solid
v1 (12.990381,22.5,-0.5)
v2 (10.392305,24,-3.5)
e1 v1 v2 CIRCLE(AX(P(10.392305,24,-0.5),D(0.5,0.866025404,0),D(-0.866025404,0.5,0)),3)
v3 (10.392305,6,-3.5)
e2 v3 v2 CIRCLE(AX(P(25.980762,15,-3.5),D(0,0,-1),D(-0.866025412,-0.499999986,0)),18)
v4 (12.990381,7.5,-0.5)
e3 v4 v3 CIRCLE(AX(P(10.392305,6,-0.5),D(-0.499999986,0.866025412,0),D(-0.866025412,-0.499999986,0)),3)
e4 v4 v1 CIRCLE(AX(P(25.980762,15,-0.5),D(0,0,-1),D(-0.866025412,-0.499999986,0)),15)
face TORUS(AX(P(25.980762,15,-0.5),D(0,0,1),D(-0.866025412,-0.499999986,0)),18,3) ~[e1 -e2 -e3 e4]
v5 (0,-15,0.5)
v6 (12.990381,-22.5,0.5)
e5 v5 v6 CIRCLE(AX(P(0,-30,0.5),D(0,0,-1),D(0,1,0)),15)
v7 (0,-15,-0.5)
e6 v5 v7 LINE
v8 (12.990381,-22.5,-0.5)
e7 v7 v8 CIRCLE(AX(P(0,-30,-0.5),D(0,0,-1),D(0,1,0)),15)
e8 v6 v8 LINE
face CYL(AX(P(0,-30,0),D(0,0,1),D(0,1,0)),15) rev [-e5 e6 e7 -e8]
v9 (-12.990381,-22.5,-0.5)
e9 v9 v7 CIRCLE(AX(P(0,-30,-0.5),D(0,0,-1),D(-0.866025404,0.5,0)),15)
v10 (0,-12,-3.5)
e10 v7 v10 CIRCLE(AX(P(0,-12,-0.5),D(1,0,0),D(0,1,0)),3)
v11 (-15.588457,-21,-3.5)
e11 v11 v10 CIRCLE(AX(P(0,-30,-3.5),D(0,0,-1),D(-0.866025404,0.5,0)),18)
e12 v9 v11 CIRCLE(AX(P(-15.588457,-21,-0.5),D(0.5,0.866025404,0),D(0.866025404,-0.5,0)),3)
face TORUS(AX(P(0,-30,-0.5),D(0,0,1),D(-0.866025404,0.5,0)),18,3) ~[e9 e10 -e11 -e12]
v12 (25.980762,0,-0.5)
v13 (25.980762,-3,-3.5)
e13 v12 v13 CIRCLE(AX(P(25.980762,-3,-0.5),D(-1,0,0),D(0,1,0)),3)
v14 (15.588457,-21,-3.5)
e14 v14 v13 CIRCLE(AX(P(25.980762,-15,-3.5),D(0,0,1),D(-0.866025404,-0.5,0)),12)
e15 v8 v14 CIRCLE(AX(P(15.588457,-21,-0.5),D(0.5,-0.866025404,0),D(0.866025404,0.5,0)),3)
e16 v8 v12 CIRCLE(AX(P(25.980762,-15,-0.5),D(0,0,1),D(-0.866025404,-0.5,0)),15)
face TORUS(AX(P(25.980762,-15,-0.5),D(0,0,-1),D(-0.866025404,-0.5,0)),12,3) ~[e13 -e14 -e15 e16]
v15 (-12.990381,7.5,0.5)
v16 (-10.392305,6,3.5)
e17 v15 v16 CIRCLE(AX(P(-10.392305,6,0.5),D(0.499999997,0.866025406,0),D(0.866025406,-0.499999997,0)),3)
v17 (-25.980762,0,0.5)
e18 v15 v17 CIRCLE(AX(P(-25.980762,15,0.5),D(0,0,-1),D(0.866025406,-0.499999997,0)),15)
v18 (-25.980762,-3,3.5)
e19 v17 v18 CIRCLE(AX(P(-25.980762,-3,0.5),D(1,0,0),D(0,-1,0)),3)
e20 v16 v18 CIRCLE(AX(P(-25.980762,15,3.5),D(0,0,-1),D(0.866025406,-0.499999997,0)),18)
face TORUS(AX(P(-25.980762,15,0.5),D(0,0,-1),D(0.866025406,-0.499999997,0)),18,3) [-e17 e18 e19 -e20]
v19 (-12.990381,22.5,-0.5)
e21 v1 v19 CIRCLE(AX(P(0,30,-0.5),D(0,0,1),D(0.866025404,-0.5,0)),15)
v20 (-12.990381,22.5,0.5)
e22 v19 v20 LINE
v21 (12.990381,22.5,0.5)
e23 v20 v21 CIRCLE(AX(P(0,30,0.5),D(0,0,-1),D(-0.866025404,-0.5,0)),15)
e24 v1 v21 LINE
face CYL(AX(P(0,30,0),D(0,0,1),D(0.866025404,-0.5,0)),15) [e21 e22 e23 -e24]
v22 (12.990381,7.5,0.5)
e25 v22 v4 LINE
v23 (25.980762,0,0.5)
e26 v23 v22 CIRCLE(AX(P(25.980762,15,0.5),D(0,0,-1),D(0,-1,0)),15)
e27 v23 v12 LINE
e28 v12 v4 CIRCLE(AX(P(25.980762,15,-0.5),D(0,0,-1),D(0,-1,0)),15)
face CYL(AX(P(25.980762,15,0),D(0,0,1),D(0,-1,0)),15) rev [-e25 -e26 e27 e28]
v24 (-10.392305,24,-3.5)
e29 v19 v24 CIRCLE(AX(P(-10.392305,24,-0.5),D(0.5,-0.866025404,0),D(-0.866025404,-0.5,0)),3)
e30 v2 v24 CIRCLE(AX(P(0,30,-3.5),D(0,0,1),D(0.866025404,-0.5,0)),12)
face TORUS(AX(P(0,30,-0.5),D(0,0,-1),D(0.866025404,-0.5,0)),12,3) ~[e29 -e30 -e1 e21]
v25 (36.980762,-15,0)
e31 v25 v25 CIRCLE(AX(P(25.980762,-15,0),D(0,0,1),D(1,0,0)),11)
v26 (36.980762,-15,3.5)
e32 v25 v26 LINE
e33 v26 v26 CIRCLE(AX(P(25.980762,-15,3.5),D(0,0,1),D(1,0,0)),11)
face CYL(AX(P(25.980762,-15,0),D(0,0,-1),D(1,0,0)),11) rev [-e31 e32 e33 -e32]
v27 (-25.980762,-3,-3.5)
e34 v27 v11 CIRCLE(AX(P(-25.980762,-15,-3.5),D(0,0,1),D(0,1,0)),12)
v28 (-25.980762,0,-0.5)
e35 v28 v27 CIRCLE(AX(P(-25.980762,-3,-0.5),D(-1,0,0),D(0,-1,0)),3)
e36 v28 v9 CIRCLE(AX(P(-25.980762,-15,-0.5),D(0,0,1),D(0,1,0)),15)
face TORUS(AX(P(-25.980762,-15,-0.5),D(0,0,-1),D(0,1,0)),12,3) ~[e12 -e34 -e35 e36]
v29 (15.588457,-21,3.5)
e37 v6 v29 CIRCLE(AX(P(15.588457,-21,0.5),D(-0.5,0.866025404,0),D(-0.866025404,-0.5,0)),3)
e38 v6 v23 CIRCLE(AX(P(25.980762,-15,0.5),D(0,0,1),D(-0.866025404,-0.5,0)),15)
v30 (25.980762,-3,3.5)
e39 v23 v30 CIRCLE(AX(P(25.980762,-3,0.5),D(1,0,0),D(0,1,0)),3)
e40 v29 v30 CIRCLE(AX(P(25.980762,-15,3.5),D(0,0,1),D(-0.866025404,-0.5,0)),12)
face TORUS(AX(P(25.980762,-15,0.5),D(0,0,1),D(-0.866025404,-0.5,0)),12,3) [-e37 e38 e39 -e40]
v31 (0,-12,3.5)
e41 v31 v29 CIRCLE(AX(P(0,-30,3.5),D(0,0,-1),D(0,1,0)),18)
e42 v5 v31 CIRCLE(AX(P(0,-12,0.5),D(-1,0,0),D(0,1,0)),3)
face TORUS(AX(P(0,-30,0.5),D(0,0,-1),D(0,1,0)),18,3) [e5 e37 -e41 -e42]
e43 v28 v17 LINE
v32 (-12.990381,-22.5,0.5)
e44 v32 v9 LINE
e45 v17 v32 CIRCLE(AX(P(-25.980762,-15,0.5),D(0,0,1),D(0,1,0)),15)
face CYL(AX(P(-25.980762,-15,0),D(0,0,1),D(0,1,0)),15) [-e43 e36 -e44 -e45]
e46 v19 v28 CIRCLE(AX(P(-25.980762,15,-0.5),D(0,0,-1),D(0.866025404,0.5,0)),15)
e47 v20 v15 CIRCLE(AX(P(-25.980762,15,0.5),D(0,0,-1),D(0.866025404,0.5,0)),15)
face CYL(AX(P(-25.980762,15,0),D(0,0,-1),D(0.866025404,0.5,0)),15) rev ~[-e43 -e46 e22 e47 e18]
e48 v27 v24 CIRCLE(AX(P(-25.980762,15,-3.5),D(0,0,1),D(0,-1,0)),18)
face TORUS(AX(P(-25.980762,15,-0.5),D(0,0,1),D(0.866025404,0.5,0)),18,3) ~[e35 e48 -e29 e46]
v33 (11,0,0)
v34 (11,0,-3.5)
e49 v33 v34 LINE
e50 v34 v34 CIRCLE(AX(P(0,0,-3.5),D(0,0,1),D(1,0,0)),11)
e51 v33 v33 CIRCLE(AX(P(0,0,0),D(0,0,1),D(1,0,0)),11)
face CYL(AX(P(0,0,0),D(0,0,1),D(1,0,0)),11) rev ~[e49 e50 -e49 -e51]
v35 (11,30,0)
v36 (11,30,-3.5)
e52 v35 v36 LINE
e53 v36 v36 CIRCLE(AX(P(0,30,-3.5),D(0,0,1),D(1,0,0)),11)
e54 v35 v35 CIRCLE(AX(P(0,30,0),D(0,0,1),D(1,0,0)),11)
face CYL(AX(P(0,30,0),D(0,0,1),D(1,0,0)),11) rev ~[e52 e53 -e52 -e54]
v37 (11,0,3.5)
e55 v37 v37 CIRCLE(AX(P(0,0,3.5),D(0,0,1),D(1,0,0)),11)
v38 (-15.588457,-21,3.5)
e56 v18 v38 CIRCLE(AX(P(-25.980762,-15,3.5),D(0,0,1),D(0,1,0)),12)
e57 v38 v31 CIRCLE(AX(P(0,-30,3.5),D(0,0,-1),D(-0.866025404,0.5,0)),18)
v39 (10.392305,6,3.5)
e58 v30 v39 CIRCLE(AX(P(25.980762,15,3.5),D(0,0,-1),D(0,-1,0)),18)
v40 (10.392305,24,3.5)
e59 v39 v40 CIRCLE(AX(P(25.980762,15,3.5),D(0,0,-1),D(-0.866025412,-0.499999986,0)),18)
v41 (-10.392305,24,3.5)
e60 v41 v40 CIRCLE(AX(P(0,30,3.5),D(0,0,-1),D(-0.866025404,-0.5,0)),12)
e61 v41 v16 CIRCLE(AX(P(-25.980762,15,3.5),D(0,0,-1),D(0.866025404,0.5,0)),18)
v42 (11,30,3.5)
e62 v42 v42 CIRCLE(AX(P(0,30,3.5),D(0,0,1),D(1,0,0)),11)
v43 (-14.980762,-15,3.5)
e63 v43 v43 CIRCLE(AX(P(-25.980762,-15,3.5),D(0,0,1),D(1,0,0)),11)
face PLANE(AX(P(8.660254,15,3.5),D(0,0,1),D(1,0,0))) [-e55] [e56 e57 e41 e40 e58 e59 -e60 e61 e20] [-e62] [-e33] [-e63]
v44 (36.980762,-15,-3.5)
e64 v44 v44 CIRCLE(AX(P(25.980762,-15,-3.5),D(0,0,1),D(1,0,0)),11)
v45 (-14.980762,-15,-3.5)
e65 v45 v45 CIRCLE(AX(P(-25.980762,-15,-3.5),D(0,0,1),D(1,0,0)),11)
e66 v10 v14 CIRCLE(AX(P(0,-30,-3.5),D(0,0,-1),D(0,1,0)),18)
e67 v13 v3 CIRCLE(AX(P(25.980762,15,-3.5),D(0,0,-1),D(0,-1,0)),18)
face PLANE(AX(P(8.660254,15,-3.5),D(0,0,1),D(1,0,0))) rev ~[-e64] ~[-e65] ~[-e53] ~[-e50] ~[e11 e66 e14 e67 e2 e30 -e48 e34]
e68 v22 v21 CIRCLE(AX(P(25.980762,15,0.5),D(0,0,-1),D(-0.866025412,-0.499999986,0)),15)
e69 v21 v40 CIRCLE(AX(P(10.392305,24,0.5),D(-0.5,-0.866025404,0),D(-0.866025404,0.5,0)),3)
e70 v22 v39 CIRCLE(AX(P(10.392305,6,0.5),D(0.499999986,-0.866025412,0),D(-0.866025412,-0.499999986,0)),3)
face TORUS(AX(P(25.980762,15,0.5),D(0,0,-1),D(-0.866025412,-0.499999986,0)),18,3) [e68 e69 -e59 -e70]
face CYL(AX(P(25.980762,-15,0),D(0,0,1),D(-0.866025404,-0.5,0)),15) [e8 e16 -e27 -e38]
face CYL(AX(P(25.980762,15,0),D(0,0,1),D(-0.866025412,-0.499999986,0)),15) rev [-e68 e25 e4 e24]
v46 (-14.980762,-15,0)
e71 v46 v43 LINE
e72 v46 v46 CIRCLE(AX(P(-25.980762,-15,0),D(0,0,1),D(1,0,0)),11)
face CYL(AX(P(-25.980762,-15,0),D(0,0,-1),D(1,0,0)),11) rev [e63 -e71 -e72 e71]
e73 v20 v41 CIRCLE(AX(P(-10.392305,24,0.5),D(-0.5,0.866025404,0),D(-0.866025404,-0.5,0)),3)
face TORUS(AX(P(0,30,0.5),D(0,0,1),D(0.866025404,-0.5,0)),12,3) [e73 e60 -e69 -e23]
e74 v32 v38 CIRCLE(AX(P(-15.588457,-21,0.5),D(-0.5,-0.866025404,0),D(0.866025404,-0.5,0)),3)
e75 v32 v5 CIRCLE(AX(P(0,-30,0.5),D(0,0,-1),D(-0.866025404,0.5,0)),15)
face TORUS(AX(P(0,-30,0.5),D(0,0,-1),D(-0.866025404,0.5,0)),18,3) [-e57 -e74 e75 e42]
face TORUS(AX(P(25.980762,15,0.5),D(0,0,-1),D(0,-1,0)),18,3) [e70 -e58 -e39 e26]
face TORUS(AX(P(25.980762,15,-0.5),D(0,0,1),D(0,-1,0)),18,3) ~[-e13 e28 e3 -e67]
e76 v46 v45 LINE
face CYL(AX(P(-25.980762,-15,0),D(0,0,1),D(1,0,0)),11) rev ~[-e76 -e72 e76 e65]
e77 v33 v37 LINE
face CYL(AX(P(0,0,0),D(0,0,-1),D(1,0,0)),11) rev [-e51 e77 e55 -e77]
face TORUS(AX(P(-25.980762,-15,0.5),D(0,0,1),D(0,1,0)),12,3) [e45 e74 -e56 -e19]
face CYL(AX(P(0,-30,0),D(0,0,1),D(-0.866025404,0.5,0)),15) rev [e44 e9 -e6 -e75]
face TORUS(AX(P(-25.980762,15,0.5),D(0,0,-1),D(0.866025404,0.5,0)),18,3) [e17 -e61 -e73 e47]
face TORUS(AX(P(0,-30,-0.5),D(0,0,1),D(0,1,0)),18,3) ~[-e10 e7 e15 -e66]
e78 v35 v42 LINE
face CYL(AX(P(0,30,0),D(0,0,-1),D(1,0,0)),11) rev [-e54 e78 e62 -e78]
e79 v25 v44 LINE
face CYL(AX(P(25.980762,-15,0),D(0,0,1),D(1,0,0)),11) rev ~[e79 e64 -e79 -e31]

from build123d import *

# Parameters (mm, degrees)
F0_R     = 11
F1_DEPTH = 3.5
F2_R     = 3
F3_R     = 3


# Not quite as in the source:
# - a feature names something its author has since deleted; it is built from what else it names


with BuildPart() as f1:
    # F0 (on Top) → F1 (new body, symmetric)
    with BuildSketch(Plane.XY):
        with BuildLine():
            ThreePointArc((0, 15), (7.4999998929, 12.9903811186), (12.990380933, 7.5000002143))
            ThreePointArc((12.990380933, 7.5000002143), (10.9807621135, 15.0000001237), (12.9903810568, 22.5))
            ThreePointArc((12.9903810568, 22.5), (7.5, 17.0096189432), (0, 15))
        make_face()
        with BuildLine():
            ThreePointArc((-12.9903810309, 7.5000000448), (-7.4999999776, 12.9903810697), (0, 15))
            ThreePointArc((0, 15), (-7.5, 17.0096189432), (-12.9903810568, 22.5))
            ThreePointArc((-12.9903810568, 22.5), (-10.9807621135, 15.0000000259), (-12.9903810309, 7.5000000448))
        make_face()
        with BuildLine():
            ThreePointArc((-12.9903810914, -7.49999994), (-15, 6.05e-08), (-12.9903810309, 7.5000000448))
            ThreePointArc((-12.9903810309, 7.5000000448), (-18.4807620911, 2.0096189562), (-25.9807621135, 0))
            ThreePointArc((-25.9807621135, 0), (-18.4807621435, -2.0096189259), (-12.9903810914, -7.49999994))
        make_face()
        with BuildLine():
            ThreePointArc((-12.9903810568, -22.5), (-7.5, -17.0096189433), (-1e-10, -15))
            ThreePointArc((-1e-10, -15), (-7.50000003, -12.9903810394), (-12.9903810914, -7.49999994))
            ThreePointArc((-12.9903810914, -7.49999994), (-11.4918747282, -11.11771429), (-10.9807621135, -15))
            ThreePointArc((-10.9807621135, -15), (-11.4918747192, -18.8822856765), (-12.9903810568, -22.5))
        make_face()
        with BuildLine():
            ThreePointArc((12.9903810568, -22.5), (10.9807621135, -15.0000001847), (12.9903808721, -7.5000003199))
            ThreePointArc((12.9903808721, -7.5000003199), (7.49999984, -12.9903811491), (-1e-10, -15))
            ThreePointArc((-1e-10, -15), (7.5, -17.0096189432), (12.9903810568, -22.5))
        make_face()
        with BuildLine():
            ThreePointArc((12.990380933, 7.5000002143), (14.4888873623, 3.882285796), (15, 0))
            ThreePointArc((15, 0), (14.4888873465, -3.882285855), (12.9903808721, -7.5000003199))
            ThreePointArc((12.9903808721, -7.5000003199), (18.4807619536, -2.0096190356), (25.9807621135, 0))
            ThreePointArc((25.9807621135, 0), (18.4807620064, 2.0096190051), (12.990380933, 7.5000002143))
        make_face()
        with BuildLine():
            ThreePointArc((12.9903808721, -7.5000003199), (14.4888873465, -3.882285855), (15, 0))
            ThreePointArc((15, 0), (14.4888873623, 3.882285796), (12.990380933, 7.5000002143))
            ThreePointArc((12.990380933, 7.5000002143), (7.4999998929, 12.9903811186), (0, 15))
            ThreePointArc((0, 15), (-7.4999999776, 12.9903810697), (-12.9903810309, 7.5000000448))
            ThreePointArc((-12.9903810309, 7.5000000448), (-15, 6.05e-08), (-12.9903810914, -7.49999994))
            ThreePointArc((-12.9903810914, -7.49999994), (-7.50000003, -12.9903810394), (-1e-10, -15))
            ThreePointArc((-1e-10, -15), (7.49999984, -12.9903811491), (12.9903808721, -7.5000003199))
        make_face()
        Circle(F0_R, mode=Mode.SUBTRACT)
        with BuildLine():
            ThreePointArc((-12.9903810568, 22.5), (-7.5, 17.0096189432), (0, 15))
            ThreePointArc((0, 15), (7.5, 17.0096189432), (12.9903810568, 22.5))
            ThreePointArc((12.9903810568, 22.5), (14.4888873943, 26.1177143235), (15, 30))
            ThreePointArc((15, 30), (-3.8822856765, 44.4888873943), (-12.9903810568, 22.5))
        make_face()
        with Locations((0, 30)):
            Circle(F0_R, mode=Mode.SUBTRACT)
        with BuildLine():
            ThreePointArc((25.9807621135, 0), (18.4807619536, -2.0096190356), (12.9903808721, -7.5000003199))
            ThreePointArc((12.9903808721, -7.5000003199), (10.9807621135, -15.0000001847), (12.9903810568, -22.5))
            ThreePointArc((12.9903810568, -22.5), (29.8630477901, -29.4888873943), (40.9807621135, -15))
            ThreePointArc((40.9807621135, -15), (36.5873638313, -4.3933982822), (25.9807621135, 0))
        make_face()
        with Locations((25.9807621135, -15)):
            Circle(F0_R, mode=Mode.SUBTRACT)
        with BuildLine():
            ThreePointArc((-10.9807621135, -15), (-11.4918747282, -11.11771429), (-12.9903810914, -7.49999994))
            ThreePointArc((-12.9903810914, -7.49999994), (-18.4807621435, -2.0096189259), (-25.9807621135, 0))
            ThreePointArc((-25.9807621135, 0), (-38.9711431703, -22.5), (-12.9903810568, -22.5))
            ThreePointArc((-12.9903810568, -22.5), (-11.4918747192, -18.8822856765), (-10.9807621135, -15))
        make_face()
        with Locations((-25.9807621135, -15)):
            Circle(F0_R, mode=Mode.SUBTRACT)
    extrude(amount=F1_DEPTH, both=True)

    # F2
    f2_edges = [f1.edges().sort_by_distance(p)[0] for p in [
        (38.971143, -22.5, 3.5),
    ]]
    fillet(f2_edges, radius=F2_R)

    # F3
    f3_edges = [f1.edges().sort_by_distance(p)[0] for p in [
        (0, -15, -3.5),
    ]]
    fillet(f3_edges, radius=F3_R)


solid = f1.part
